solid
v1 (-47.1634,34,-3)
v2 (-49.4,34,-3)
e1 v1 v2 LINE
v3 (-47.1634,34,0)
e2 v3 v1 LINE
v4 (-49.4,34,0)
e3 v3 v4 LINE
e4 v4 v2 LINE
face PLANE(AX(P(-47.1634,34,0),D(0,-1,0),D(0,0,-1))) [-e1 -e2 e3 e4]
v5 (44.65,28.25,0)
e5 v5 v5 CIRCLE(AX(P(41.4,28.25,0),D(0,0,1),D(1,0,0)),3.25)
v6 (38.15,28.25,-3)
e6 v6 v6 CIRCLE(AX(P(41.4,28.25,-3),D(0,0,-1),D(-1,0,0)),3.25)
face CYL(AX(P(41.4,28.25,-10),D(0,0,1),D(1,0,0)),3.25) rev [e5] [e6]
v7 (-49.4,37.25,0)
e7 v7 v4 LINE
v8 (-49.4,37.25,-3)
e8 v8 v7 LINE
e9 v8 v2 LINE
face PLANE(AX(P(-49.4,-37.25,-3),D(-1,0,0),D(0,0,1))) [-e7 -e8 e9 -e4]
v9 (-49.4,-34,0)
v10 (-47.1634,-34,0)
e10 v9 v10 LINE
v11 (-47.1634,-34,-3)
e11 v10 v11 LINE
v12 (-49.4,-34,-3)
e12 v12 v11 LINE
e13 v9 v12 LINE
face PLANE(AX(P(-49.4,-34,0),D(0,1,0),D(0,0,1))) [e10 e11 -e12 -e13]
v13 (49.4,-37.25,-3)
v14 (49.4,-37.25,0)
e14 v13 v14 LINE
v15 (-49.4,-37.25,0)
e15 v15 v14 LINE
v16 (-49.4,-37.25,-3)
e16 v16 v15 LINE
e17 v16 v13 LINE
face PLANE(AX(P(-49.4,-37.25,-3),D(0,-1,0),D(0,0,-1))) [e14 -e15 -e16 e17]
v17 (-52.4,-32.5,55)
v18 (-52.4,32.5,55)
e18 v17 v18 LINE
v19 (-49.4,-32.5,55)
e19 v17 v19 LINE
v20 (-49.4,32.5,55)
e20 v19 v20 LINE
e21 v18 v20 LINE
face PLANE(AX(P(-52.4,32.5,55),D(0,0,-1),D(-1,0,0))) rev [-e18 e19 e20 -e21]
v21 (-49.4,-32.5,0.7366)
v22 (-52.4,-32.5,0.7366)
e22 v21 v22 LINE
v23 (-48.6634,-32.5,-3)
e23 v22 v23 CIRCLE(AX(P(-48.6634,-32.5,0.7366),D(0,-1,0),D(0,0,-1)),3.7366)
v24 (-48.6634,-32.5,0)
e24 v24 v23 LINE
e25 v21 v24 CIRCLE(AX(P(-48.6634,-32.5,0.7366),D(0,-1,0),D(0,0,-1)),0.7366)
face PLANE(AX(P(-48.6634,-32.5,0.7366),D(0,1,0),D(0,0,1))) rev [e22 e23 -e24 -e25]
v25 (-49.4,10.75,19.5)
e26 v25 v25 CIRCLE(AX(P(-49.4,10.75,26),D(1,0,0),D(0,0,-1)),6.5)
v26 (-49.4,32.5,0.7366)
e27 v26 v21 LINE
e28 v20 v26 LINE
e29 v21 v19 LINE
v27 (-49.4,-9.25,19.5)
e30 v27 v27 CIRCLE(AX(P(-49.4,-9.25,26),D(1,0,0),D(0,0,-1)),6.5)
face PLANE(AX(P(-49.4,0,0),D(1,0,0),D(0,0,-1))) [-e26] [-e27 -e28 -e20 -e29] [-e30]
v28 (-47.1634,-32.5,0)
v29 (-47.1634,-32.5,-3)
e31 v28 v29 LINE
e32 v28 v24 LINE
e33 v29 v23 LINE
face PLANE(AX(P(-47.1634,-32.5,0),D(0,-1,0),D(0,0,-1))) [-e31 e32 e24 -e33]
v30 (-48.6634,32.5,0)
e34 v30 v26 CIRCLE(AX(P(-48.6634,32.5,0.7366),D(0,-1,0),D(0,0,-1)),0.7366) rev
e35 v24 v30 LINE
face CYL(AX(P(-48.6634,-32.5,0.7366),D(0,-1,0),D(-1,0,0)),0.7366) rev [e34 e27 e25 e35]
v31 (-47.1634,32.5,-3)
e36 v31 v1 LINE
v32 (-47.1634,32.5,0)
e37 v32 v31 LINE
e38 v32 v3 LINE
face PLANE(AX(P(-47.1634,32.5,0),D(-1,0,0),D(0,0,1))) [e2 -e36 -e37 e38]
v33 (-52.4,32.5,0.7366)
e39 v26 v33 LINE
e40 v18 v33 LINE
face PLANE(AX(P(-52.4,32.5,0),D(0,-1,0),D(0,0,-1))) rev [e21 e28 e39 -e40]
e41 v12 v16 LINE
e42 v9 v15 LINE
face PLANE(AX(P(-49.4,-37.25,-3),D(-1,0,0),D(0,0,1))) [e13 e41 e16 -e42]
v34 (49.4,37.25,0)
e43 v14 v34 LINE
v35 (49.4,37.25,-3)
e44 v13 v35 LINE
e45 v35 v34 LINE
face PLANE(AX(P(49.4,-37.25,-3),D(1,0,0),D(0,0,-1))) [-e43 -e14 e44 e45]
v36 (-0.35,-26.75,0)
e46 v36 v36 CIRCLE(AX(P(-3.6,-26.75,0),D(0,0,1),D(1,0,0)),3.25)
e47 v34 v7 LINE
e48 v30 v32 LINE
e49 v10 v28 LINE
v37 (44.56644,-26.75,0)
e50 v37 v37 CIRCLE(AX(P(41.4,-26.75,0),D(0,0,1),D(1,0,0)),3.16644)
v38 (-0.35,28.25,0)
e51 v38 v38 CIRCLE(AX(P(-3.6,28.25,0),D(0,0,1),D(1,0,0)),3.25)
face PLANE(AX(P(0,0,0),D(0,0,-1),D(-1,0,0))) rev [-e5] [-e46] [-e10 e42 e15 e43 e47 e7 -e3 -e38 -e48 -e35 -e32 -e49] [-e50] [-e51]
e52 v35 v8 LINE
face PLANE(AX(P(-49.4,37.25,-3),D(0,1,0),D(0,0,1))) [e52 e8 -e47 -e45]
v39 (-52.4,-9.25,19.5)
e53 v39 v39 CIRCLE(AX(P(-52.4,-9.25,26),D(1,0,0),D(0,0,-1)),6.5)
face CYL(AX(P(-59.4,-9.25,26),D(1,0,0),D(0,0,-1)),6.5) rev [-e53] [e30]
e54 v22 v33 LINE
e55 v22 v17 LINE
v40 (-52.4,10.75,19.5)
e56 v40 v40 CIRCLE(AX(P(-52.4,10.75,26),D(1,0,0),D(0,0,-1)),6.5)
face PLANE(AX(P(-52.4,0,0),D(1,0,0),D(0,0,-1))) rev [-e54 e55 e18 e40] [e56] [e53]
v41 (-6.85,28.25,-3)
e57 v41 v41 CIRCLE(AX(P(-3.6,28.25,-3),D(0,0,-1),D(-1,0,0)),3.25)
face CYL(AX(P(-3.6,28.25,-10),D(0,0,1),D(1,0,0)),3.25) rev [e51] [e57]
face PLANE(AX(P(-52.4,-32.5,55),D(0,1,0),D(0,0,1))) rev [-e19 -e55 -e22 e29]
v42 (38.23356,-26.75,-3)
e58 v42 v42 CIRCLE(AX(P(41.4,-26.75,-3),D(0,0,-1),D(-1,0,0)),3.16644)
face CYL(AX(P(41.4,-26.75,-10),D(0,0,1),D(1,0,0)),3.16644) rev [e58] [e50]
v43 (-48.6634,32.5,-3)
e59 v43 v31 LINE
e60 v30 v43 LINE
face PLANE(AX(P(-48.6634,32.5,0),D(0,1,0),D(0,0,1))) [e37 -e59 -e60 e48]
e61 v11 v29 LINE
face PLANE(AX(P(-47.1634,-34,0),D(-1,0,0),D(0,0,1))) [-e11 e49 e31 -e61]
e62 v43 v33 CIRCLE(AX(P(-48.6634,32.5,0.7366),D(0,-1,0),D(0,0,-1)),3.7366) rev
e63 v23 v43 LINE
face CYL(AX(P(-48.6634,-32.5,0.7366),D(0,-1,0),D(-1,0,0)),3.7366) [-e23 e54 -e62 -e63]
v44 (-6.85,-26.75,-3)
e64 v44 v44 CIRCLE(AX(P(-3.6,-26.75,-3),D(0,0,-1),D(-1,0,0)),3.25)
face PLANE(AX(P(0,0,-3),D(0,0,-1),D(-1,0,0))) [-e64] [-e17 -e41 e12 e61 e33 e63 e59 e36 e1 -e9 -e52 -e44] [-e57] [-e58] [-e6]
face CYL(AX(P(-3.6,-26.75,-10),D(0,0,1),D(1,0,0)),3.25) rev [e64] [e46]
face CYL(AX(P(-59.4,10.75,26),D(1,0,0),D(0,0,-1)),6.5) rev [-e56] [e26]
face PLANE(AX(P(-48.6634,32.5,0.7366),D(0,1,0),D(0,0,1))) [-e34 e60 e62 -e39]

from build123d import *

# Parameters (mm, degrees)
IZIM1_W                       = 98.8
IZIM1_H                       = 74.5
TABAN_FLAN_1_DEPTH            = 3
KENAR_FLAN_1_STRIP_W          = 13.4732
KENAR_FLAN_1_STRIP_H          = 3
KENAR_FLAN_1_STRIP_CUT_DEPTH  = 65
KENAR_FLAN_1_RELIEF_W         = 14.9732
KENAR_FLAN_1_RELIEF_H         = 1.5
KENAR_FLAN_1_RELIEF_CUT_DEPTH = 3
KENAR_FLAN_1_DEPTH            = 65
IZIM9_R                       = 6.5
KES_EKSTR_ZYON1_DEPTH         = 10
IZIM11_R                      = 3.25
IZIM11_R_2                    = 3.166439954
KES_EKSTR_ZYON2_DEPTH         = 10


# Sheet-metal steps are written as plain solids
with BuildPart() as part:
    # Çizim1 → Taban-Flanş1 (new body)
    with BuildSketch(Plane.XY):
        Rectangle(IZIM1_W, IZIM1_H)
    extrude(amount=-TABAN_FLAN_1_DEPTH)

    # Kenar-Flanş1 strip (across the edge) → Kenar-Flanş1 strip cut (cut)
    with BuildSketch(Plane(origin=(-49.4, 32.5, 0), x_dir=(1, 0, 0), z_dir=(0, -1, 0))):
        with Locations((-6, -1.5)):
            Rectangle(KENAR_FLAN_1_STRIP_W, KENAR_FLAN_1_STRIP_H)
    extrude(amount=KENAR_FLAN_1_STRIP_CUT_DEPTH, mode=Mode.SUBTRACT)

    # Kenar-Flanş1 relief (on the sheet) → Kenar-Flanş1 relief cut (cut)
    with BuildSketch(Plane(origin=(-48.6634, 32.5, 0), x_dir=(1, 0, 0), z_dir=(0, 0, 1))):
        with Locations((-5.9866, 0.75)):
            Rectangle(KENAR_FLAN_1_RELIEF_W, KENAR_FLAN_1_RELIEF_H)
        with Locations((-5.9866, -65.75)):
            Rectangle(KENAR_FLAN_1_RELIEF_W, KENAR_FLAN_1_RELIEF_H)
    extrude(amount=-KENAR_FLAN_1_RELIEF_CUT_DEPTH, mode=Mode.SUBTRACT)

    # Kenar-Flanş1 section (across the edge) → Kenar-Flanş1 (add)
    with BuildSketch(Plane(origin=(-49.4, 32.5, 0), x_dir=(1, 0, 0), z_dir=(0, -1, 0))):
        with BuildLine():
            Line((-3, 0.7366), (-3, 55))
            Line((-3, 55), (0, 55))
            Line((0, 55), (0, 0.7366))
            ThreePointArc((0, 0.7366), (0.215745145, 0.215745145), (0.7366, 0))
            Line((0.7366, 0), (0.7366, -3))
            ThreePointArc((0.7366, -3), (-1.905575199, -1.905575199), (-3, 0.7366))
        make_face()
    extrude(amount=KENAR_FLAN_1_DEPTH)

    # Çizim9 → Kes-Ekstrüzyon1 (cut)
    with BuildSketch(Plane(origin=(-49.4, 0, 0), x_dir=(0, 0, -1), z_dir=(1, 0, 0))):
        with Locations((-26, 10.75)):
            Circle(IZIM9_R)
        with Locations((-26, -9.25)):
            Circle(IZIM9_R)
    extrude(amount=-KES_EKSTR_ZYON1_DEPTH, mode=Mode.SUBTRACT)

    # Çizim11 → Kes-Ekstrüzyon2 (cut)
    with BuildSketch(Plane.XY):
        with Locations((41.4, 28.25)):
            Circle(IZIM11_R)
        with Locations((-3.6, 28.25)):
            Circle(IZIM11_R)
        with Locations((-3.6, -26.75)):
            Circle(IZIM11_R)
        with Locations((41.4, -26.75)):
            Circle(IZIM11_R_2)
    extrude(amount=-KES_EKSTR_ZYON2_DEPTH, mode=Mode.SUBTRACT)


solid = part.part
